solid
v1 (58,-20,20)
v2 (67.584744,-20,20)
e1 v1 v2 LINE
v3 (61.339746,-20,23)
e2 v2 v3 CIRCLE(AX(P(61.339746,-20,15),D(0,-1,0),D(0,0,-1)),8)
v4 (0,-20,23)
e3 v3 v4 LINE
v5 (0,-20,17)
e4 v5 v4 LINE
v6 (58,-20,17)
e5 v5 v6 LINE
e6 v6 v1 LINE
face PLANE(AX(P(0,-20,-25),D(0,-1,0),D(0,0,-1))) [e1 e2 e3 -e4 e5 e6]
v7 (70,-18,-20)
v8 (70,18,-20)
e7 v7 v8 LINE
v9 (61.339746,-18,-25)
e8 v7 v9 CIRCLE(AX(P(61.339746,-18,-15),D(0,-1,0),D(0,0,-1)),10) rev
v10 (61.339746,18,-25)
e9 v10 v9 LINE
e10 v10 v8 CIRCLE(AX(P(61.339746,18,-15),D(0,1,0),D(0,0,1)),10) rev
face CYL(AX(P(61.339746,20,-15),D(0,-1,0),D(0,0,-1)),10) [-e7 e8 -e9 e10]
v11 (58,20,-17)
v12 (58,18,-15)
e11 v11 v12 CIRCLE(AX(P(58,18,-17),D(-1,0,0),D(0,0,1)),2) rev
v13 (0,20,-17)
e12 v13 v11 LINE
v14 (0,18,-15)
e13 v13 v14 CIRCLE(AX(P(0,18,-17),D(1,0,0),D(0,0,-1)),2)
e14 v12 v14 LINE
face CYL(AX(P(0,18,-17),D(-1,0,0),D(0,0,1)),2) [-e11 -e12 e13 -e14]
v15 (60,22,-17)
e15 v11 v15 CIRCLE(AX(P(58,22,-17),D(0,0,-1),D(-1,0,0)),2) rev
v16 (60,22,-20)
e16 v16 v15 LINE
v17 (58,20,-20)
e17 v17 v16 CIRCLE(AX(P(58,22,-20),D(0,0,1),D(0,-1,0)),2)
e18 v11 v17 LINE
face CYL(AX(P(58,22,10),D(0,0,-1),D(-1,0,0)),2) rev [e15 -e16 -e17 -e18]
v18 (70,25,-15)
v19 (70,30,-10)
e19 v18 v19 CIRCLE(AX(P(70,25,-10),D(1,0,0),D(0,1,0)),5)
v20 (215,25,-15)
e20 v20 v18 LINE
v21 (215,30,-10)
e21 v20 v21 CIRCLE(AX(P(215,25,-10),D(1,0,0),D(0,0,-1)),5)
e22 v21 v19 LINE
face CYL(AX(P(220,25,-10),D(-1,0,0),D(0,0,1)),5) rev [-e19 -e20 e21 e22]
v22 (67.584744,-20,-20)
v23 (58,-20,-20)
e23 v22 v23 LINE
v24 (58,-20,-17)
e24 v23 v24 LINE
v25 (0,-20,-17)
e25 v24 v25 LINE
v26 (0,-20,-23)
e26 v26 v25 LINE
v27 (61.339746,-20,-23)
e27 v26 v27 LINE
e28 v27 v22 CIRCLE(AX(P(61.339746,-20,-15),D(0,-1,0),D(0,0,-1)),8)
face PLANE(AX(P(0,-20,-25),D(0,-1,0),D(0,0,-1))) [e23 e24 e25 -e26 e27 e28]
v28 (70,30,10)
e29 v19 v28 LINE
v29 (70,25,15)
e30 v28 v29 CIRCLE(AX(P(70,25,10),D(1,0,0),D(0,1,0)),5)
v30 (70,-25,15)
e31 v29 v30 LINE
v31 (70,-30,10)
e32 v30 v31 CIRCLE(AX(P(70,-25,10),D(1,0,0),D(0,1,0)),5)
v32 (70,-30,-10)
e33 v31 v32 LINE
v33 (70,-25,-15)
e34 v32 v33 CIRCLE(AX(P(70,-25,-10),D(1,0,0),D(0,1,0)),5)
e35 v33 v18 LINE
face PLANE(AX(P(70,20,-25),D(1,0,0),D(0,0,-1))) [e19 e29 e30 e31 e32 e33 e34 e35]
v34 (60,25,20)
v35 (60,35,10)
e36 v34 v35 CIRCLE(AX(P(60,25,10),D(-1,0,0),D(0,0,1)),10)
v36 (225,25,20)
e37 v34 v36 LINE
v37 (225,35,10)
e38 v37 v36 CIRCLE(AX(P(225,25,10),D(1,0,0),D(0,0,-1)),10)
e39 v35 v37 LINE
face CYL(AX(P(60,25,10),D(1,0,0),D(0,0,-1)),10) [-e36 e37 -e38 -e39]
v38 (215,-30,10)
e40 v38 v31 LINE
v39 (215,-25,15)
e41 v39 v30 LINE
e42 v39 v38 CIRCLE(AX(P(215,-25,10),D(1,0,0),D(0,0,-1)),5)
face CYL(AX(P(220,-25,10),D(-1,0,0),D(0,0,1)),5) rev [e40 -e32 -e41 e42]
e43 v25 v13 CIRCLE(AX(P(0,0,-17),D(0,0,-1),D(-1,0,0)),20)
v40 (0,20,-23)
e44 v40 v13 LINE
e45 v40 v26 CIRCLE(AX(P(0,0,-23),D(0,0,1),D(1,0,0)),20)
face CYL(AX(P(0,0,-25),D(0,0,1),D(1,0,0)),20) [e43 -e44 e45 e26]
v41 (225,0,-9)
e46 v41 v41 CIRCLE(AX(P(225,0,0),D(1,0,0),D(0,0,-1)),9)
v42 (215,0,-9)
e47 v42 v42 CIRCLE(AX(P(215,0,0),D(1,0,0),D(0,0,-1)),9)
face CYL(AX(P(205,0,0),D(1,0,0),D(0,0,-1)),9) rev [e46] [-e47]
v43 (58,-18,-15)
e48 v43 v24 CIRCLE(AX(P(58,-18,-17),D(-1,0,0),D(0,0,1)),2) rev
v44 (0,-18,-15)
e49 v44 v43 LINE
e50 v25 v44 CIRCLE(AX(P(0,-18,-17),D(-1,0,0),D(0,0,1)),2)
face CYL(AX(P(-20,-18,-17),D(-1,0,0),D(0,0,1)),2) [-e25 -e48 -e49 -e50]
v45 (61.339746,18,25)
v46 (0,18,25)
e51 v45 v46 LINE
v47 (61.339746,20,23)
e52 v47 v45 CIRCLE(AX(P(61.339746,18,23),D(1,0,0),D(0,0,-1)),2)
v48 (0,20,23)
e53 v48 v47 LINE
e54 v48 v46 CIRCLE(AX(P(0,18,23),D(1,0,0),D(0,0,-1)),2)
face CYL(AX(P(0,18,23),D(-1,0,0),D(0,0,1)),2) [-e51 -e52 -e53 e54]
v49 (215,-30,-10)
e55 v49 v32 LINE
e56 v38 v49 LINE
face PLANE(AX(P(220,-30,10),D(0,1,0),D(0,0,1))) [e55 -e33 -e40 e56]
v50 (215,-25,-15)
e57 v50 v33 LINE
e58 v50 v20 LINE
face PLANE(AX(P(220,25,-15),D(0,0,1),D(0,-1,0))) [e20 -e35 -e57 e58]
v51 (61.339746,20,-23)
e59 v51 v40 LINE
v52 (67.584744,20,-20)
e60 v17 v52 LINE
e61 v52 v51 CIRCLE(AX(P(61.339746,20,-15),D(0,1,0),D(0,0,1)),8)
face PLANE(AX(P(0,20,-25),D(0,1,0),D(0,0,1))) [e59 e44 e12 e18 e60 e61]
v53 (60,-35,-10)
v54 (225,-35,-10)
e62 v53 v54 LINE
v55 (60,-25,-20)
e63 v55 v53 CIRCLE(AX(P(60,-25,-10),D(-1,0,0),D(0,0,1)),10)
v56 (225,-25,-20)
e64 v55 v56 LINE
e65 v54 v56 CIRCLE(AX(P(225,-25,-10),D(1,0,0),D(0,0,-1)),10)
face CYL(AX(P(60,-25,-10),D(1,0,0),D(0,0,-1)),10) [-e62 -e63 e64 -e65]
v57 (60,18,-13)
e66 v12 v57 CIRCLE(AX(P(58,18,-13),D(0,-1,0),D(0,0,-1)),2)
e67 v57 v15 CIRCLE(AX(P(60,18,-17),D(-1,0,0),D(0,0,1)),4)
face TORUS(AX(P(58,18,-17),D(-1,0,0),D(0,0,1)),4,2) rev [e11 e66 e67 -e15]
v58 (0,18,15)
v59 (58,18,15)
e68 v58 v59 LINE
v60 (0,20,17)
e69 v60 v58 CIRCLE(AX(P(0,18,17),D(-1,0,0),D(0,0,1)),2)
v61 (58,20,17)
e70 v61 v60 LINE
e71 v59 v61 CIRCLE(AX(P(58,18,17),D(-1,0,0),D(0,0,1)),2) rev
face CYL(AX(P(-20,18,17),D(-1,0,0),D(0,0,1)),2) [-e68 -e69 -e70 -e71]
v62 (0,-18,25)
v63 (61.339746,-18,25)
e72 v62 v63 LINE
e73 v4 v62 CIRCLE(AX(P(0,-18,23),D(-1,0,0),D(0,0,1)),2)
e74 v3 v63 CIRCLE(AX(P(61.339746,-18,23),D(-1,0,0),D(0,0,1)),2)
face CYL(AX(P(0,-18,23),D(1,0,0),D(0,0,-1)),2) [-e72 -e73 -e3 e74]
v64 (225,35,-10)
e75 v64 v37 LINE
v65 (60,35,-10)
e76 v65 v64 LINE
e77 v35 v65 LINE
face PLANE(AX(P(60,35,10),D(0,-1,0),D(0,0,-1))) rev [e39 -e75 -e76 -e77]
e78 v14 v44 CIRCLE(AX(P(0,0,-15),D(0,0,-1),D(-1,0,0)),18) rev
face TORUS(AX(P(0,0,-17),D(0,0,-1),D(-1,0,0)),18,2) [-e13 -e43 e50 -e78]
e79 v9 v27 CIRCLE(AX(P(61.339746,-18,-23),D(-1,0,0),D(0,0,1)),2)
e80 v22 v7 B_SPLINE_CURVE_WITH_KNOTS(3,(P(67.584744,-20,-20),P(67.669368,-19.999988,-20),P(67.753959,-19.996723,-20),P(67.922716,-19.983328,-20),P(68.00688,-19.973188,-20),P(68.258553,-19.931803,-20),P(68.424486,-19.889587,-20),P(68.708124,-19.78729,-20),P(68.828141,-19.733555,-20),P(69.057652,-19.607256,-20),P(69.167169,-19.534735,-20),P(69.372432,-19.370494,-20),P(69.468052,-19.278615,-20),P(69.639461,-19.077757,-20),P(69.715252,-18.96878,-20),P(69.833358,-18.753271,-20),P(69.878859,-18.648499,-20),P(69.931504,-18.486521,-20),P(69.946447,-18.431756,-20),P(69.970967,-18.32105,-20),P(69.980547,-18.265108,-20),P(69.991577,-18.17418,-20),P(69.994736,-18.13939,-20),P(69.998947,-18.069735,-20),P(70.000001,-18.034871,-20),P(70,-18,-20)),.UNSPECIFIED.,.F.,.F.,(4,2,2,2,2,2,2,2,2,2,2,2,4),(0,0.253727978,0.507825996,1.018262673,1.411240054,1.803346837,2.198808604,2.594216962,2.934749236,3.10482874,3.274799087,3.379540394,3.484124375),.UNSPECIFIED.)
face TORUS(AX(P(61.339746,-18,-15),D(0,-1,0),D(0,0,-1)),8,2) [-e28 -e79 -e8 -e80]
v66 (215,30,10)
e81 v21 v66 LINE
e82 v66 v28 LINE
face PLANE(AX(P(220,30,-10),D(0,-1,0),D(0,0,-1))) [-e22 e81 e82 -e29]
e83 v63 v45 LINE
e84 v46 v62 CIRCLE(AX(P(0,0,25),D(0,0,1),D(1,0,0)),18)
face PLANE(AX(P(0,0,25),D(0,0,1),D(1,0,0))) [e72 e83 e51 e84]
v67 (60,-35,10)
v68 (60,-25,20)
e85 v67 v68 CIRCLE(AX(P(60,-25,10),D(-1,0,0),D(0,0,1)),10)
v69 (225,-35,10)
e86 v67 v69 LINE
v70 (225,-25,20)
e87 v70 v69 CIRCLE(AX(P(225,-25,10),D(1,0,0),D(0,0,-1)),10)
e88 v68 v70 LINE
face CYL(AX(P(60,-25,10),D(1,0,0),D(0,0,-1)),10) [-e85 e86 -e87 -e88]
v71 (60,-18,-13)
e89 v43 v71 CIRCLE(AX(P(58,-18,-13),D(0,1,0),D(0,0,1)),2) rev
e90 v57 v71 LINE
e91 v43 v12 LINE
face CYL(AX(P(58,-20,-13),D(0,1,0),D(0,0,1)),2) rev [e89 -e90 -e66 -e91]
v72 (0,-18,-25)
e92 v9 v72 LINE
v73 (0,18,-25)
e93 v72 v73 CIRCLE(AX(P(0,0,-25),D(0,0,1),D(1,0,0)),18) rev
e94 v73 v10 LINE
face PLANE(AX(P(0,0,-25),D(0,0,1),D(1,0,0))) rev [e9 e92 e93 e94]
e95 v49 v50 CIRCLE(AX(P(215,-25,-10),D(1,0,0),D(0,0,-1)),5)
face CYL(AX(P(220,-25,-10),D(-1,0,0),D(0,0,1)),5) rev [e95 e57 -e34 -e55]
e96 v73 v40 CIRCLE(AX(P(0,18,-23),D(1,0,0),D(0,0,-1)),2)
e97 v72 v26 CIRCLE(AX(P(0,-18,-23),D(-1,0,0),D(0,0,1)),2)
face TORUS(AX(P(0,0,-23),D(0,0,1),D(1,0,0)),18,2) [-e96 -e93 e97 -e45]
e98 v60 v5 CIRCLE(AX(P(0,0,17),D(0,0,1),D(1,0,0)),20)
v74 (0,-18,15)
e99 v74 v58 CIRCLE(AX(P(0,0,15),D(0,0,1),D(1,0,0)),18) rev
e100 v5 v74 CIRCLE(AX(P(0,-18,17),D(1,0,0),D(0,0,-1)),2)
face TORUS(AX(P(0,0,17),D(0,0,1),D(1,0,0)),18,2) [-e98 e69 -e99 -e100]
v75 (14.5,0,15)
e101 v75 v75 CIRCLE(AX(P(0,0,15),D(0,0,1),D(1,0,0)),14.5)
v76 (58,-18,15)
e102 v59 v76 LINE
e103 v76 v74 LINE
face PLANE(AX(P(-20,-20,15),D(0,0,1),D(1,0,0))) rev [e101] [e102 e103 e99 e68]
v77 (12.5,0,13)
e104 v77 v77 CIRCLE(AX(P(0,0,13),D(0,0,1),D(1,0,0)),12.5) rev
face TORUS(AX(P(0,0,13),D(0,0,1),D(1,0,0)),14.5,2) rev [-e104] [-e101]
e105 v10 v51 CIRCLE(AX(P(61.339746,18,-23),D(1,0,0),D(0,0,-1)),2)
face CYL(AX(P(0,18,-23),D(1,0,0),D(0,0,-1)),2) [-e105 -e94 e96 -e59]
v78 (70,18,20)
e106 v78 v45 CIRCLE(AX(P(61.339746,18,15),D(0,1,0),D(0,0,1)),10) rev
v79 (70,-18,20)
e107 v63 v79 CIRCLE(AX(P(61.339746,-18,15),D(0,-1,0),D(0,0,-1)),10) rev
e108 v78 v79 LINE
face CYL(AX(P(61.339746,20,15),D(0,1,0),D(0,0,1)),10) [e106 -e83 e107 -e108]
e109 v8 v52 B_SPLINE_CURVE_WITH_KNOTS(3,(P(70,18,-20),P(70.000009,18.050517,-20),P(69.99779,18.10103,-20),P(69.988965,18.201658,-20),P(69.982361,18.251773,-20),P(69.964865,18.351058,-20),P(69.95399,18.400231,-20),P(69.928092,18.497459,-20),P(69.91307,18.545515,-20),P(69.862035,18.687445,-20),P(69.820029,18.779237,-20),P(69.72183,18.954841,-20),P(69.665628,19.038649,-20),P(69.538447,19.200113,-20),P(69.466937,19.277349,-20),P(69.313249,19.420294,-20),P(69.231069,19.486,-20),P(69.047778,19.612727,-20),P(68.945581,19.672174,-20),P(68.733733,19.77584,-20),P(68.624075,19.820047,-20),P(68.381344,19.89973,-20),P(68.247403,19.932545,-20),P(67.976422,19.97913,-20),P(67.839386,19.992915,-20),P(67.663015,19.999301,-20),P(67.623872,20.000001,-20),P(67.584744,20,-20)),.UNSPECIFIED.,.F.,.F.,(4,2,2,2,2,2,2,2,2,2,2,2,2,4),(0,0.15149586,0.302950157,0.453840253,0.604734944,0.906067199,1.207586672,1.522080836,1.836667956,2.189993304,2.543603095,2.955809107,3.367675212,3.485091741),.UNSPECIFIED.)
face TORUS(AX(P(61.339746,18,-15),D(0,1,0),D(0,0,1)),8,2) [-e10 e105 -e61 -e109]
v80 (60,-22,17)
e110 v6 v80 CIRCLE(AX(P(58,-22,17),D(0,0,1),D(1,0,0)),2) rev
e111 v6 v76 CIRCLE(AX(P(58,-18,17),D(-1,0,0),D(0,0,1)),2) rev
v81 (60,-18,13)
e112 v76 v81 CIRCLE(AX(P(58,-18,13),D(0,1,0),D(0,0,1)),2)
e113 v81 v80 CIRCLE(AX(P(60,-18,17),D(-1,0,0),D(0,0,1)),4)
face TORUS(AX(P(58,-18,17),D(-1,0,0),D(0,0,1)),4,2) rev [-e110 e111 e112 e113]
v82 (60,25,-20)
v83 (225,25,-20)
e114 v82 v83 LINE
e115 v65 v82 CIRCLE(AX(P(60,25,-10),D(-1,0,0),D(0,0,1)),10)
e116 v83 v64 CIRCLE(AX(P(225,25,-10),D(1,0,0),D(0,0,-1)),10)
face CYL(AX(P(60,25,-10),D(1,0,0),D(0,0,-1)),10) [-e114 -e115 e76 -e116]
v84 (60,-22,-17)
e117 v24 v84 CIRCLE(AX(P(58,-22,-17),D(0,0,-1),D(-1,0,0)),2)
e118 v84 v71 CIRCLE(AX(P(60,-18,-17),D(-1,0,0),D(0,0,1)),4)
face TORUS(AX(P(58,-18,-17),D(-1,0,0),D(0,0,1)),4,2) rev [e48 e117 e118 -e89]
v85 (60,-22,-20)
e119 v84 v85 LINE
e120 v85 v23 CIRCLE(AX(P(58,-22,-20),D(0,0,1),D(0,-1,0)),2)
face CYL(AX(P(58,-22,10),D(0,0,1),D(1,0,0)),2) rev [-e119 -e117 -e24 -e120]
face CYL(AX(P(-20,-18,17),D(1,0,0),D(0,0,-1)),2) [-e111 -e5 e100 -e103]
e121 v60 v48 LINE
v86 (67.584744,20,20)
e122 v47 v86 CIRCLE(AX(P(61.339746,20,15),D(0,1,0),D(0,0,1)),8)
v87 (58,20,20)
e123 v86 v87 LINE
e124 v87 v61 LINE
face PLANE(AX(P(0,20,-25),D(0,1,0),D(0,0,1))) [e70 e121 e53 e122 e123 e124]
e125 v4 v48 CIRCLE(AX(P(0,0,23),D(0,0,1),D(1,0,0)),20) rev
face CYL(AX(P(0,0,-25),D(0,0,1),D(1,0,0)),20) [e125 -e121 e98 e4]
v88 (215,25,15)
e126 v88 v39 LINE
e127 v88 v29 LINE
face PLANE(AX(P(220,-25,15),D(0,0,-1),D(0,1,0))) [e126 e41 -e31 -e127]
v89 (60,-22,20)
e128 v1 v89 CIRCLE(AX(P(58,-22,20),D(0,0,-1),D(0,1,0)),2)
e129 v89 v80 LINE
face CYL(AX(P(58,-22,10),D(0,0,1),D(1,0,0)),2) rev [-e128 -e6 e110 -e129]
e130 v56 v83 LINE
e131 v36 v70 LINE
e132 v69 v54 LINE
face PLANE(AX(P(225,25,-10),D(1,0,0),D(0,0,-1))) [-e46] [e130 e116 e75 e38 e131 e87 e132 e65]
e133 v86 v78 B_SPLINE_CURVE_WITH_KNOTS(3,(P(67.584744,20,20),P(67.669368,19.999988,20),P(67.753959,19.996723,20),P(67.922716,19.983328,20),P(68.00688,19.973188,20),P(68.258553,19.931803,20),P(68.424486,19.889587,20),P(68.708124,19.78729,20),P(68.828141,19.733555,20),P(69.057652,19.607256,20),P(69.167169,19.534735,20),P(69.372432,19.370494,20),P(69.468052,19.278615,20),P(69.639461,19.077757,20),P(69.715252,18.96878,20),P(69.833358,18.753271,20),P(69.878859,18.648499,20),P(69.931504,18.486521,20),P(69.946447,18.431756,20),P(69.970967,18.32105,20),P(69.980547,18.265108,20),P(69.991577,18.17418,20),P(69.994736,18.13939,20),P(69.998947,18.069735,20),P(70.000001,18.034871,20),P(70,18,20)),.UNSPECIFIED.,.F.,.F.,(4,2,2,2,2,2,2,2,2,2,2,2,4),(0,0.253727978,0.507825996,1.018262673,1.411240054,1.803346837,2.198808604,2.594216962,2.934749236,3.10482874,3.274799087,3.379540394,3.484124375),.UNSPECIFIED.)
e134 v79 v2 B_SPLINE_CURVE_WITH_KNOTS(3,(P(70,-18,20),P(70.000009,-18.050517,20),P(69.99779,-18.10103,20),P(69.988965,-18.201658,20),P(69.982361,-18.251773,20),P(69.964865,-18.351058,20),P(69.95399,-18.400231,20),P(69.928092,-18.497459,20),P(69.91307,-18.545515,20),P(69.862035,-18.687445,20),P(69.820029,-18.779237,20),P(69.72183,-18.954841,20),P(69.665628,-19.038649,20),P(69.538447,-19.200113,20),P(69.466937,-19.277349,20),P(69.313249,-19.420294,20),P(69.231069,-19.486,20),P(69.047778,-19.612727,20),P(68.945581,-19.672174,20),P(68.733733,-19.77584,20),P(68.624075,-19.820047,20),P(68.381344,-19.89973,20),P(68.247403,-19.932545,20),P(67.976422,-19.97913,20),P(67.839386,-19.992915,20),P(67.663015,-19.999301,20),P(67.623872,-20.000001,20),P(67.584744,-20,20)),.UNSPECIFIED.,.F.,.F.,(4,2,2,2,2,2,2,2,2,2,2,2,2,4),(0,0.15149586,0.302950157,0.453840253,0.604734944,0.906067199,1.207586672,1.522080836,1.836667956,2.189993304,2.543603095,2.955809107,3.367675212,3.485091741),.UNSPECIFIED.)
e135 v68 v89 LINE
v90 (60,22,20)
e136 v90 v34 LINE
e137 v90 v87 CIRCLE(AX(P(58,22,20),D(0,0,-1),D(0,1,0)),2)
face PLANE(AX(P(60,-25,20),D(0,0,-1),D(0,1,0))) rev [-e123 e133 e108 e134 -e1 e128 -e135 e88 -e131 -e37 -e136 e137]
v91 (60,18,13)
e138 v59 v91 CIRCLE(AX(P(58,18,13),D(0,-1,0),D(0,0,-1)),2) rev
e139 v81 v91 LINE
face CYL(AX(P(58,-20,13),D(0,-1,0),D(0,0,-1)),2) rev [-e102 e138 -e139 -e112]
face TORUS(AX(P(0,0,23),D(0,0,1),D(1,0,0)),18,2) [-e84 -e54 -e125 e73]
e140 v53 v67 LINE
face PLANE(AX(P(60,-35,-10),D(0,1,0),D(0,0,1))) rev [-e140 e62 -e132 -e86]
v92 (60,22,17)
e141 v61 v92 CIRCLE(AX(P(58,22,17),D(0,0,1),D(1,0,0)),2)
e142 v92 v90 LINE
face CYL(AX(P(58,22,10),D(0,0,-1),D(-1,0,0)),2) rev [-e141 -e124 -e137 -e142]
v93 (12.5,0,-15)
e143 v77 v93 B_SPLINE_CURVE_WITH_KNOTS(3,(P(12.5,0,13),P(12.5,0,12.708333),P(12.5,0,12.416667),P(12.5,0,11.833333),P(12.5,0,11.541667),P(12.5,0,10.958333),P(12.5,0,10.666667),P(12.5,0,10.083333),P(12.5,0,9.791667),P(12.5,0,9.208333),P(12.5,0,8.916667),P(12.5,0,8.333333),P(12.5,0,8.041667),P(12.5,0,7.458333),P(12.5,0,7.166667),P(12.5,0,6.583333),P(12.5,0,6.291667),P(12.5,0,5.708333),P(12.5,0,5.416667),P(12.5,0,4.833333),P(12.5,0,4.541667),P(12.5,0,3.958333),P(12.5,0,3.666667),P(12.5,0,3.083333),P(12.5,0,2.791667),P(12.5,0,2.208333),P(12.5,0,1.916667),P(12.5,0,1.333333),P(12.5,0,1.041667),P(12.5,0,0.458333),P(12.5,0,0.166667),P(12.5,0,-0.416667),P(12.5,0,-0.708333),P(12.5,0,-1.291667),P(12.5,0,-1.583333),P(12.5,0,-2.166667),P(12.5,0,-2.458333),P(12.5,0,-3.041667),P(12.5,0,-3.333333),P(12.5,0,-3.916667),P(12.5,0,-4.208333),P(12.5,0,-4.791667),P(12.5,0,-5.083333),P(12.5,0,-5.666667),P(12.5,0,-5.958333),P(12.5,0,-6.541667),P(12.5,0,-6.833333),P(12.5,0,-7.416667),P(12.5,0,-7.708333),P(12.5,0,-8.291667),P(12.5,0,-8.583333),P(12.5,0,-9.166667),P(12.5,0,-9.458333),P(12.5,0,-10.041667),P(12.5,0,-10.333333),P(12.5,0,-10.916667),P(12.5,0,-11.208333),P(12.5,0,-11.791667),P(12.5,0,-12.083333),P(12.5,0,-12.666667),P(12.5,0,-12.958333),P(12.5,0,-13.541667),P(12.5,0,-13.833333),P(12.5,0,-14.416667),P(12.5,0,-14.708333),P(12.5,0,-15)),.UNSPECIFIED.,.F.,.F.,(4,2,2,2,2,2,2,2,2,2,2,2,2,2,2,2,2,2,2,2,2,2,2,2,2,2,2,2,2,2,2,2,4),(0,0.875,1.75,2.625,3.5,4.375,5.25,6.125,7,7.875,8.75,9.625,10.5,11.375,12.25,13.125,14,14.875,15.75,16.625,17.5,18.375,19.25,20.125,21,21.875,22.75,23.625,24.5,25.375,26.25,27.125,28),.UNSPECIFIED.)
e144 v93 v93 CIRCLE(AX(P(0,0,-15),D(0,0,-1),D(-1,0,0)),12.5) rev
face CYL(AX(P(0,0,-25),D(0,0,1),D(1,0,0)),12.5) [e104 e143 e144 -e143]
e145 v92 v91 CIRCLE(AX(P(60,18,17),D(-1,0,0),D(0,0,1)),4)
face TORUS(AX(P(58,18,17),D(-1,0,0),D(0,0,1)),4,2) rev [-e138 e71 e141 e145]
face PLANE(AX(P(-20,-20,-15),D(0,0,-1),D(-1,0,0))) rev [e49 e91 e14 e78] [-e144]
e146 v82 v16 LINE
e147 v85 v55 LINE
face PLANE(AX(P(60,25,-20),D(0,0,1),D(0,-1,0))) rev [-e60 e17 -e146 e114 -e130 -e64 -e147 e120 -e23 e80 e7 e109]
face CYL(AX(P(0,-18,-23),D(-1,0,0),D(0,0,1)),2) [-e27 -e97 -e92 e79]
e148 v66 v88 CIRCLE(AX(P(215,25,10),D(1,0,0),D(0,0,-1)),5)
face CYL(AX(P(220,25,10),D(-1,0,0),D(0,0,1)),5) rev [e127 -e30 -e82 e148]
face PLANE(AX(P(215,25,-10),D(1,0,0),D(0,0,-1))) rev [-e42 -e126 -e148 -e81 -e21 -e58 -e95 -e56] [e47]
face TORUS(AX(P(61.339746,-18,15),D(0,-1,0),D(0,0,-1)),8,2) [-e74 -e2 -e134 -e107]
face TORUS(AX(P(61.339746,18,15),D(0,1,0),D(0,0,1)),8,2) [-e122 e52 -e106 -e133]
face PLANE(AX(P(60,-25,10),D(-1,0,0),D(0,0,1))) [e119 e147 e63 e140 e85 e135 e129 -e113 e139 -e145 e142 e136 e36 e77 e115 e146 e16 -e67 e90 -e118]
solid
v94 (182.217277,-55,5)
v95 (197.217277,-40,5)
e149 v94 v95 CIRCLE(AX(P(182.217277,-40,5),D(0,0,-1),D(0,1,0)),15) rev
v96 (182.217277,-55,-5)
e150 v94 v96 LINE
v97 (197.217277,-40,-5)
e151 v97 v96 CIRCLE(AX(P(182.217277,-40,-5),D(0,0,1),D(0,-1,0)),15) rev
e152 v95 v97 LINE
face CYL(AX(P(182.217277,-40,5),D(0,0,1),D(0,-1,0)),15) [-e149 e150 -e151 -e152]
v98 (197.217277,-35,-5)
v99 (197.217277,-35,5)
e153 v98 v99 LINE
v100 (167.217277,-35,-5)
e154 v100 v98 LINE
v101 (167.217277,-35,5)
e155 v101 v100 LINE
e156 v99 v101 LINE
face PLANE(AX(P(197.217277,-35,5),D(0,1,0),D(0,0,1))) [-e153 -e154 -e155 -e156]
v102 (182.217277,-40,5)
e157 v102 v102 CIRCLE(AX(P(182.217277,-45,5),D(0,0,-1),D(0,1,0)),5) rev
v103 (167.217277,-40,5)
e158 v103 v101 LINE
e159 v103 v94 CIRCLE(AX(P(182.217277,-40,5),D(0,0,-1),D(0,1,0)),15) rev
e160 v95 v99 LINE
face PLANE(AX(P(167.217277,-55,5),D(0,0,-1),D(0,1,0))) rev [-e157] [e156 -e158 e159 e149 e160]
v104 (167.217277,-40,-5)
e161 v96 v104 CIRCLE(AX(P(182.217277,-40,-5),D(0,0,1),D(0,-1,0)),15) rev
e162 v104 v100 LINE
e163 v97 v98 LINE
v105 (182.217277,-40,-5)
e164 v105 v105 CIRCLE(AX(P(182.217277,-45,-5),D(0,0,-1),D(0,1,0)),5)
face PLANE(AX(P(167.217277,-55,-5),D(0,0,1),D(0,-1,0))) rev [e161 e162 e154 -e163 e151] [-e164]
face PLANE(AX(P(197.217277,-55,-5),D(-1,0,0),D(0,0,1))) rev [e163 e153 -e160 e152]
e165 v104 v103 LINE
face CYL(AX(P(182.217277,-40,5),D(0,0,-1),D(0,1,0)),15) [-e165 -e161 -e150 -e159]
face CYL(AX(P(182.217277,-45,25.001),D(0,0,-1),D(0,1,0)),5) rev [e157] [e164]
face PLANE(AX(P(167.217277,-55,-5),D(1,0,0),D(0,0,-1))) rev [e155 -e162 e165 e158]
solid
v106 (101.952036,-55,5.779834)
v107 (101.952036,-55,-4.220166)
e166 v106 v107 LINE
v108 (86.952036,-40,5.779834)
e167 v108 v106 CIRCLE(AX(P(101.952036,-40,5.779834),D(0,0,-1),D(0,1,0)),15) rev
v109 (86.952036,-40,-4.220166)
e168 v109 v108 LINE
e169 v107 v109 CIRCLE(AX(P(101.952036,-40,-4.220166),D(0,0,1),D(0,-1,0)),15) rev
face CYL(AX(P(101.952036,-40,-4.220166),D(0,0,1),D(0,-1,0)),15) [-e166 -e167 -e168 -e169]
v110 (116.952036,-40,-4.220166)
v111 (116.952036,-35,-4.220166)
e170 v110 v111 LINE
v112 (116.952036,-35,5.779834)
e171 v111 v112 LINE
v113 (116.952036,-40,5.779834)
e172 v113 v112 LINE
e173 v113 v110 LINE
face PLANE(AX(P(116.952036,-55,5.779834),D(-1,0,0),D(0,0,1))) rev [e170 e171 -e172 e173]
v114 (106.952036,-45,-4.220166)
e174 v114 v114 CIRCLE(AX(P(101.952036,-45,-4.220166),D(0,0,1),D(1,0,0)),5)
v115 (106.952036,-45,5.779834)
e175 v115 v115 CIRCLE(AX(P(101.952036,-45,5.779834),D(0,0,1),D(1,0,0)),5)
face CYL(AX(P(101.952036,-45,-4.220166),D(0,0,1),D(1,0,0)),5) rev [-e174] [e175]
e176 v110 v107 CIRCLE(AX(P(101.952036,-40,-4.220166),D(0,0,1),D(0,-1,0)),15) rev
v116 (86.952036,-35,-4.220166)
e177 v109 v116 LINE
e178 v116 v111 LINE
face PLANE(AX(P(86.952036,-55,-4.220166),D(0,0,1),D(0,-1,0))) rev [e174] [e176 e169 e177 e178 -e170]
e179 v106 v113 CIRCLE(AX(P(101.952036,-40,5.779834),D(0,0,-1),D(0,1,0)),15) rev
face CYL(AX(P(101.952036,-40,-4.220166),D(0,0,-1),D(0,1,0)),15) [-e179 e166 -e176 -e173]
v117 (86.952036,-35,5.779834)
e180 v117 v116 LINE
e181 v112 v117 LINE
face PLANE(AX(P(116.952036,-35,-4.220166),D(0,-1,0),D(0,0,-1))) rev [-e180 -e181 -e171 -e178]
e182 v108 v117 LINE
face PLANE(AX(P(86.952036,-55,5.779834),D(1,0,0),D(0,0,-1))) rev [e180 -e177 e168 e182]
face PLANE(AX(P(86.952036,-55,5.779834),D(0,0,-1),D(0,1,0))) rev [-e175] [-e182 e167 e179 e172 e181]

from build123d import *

# Parameters (mm, degrees)
BOSS_EXTRUDE1_DEPTH      = 25
BOSS_EXTRUDE1_DEPTH_BACK = 25
SKETCH2_W                = 30
SKETCH2_H                = 40
CUT_EXTRUDE1_DEPTH       = 96.524865873
BOSS_EXTRUDE2_REACH      = 90.318
SKETCH3_R                = 12.5
STRUCTURAL_MEMBER1_DEPTH = 150
BOSS_EXTRUDE3_DEPTH      = 10
BOSS_EXTRUDE4_DEPTH      = 5
BOSS_EXTRUDE4_DEPTH_BACK = 5
FILLET1_R                = 10
FILLET2_R                = 2
FILLET3_R                = 2
SKETCH17_W               = 30
SKETCH17_H               = 10
BOSS_EXTRUDE5_DEPTH      = 20
BOSS_EXTRUDE5_2_DEPTH    = 20
FILLET4_R                = 15
SKETCH18_R               = 5
CUT_EXTRUDE2_DEPTH       = 10
FILLET5_R                = 15
SKETCH19_R               = 5
CUT_EXTRUDE3_DEPTH       = 10
SKETCH20_R               = 9
CUT_EXTRUDE4_DEPTH       = 20


# Some blends are built 0.0001 mm under size
with BuildPart() as part:
    # Sketch1 → Boss-Extrude1 (new, two sides: drawn at the far end of the back side and taken through both)
    with BuildSketch(Plane.XY.offset(-BOSS_EXTRUDE1_DEPTH_BACK)):
        with BuildLine():
            Line((0, 20), (70, 20))
            Line((70, 20), (70, -20))
            Line((70, -20), (0, -20))
            ThreePointArc((0, -20), (-20, 0), (0, 20))
        make_face()
    extrude(amount=BOSS_EXTRUDE1_DEPTH + BOSS_EXTRUDE1_DEPTH_BACK)

    # Sketch2 → Cut-Extrude1 (cut, through all)
    with BuildSketch(Plane(origin=(70, 0, 0), x_dir=(0, 0, -1), z_dir=(1, 0, 0))):
        Rectangle(SKETCH2_W, SKETCH2_H)
    extrude(amount=-CUT_EXTRUDE1_DEPTH, mode=Mode.SUBTRACT)


with BuildPart() as cut_extrude1_piece_1:
    # of the separate pieces the step leaves, piece 1, a body of its own (cut_extrude1_pieces)
    add(part.part.solids().sort_by_distance((0, 20, -25))[0])

    # Sketch3 → Boss-Extrude2 (add, up to next)
    with BuildSketch(Plane.XY.offset(25), mode=Mode.PRIVATE) as boss_extrude2_sk1:
        Circle(SKETCH3_R)
    boss_extrude2_tool1 = extrude(boss_extrude2_sk1.sketch, amount=-BOSS_EXTRUDE2_REACH, mode=Mode.PRIVATE) - cut_extrude1_piece_1.part


with BuildPart() as cut_extrude1_piece_2:
    # of the separate pieces the step leaves, piece 2, a body of its own (cut_extrude1_pieces)
    add(part.part.solids().sort_by_distance((0, 20, 15))[0])


with BuildPart() as cut_extrude1_piece_1_1:
    add(cut_extrude1_piece_1.part)

    add(cut_extrude1_piece_2.part)  # Boss-Extrude2 merges Cut-Extrude1 piece 2
    add(boss_extrude2_tool1.solids().sort_by_distance((0, 0, 25))[0])



with BuildPart() as body_2:
    # Sketch11 → Structural Member1 (new body)
    with BuildSketch(Plane(origin=(70, 0, 0), x_dir=(0, 0, 1), z_dir=(1, 0, 0))):
        with BuildLine():
            Line((-10, -35), (10, -35))
            ThreePointArc((10, -35), (17.071067812, -32.071067812), (20, -25))
            Line((20, -25), (20, 25))
            ThreePointArc((20, 25), (17.071067812, 32.071067812), (10, 35))
            Line((10, 35), (-10, 35))
            ThreePointArc((-10, 35), (-17.071067812, 32.071067812), (-20, 25))
            Line((-20, 25), (-20, -25))
            ThreePointArc((-20, -25), (-17.071067812, -32.071067812), (-10, -35))
        make_face()
        with BuildLine():
            Line((-10, -30), (10, -30))
            ThreePointArc((10, -30), (13.535533906, -28.535533906), (15, -25))
            Line((15, -25), (15, 25))
            ThreePointArc((15, 25), (13.535533906, 28.535533906), (10, 30))
            Line((10, 30), (-10, 30))
            ThreePointArc((-10, 30), (-13.535533906, 28.535533906), (-15, 25))
            Line((-15, 25), (-15, -25))
            ThreePointArc((-15, -25), (-13.535533906, -28.535533906), (-10, -30))
        make_face(mode=Mode.SUBTRACT)
    extrude(amount=STRUCTURAL_MEMBER1_DEPTH)


with BuildPart() as cut_extrude1_piece_1_2:
    add(cut_extrude1_piece_1_1.part)

    add(body_2.part)  # Boss-Extrude3 merges body 2
    # Sketch12 → Boss-Extrude3 (add)
    with BuildSketch(Plane.ZY.offset(-70)):
        with BuildLine():
            Line((20, -25), (20, 25))
            ThreePointArc((20, 25), (17.071067812, 32.071067812), (10, 35))
            Line((10, 35), (-10, 35))
            ThreePointArc((-10, 35), (-17.071067812, 32.071067812), (-20, 25))
            Line((-20, 25), (-20, -25))
            ThreePointArc((-20, -25), (-17.071067812, -32.071067812), (-10, -35))
            Line((-10, -35), (10, -35))
            ThreePointArc((10, -35), (17.071067812, -32.071067812), (20, -25))
        make_face()
    extrude(amount=BOSS_EXTRUDE3_DEPTH)

    # Sketch14 → Boss-Extrude4 (add, two sides: drawn at the far end of the back side and taken through both)
    with BuildSketch(Plane(origin=(220, 0, 0), x_dir=(0, 0, -1), z_dir=(1, 0, 0)).offset(-BOSS_EXTRUDE4_DEPTH_BACK)):
        with BuildLine():
            Line((10, 35), (-10, 35))
            ThreePointArc((-10, 35), (-17.071067812, 32.071067812), (-20, 25))
            Line((-20, 25), (-20, -25))
            ThreePointArc((-20, -25), (-17.071067812, -32.071067812), (-10, -35))
            Line((-10, -35), (10, -35))
            ThreePointArc((10, -35), (17.071067812, -32.071067812), (20, -25))
            Line((20, -25), (20, 25))
            ThreePointArc((20, 25), (17.071067812, 32.071067812), (10, 35))
        make_face()
    extrude(amount=BOSS_EXTRUDE4_DEPTH + BOSS_EXTRUDE4_DEPTH_BACK)

    # Fillet1
    # the kernel refuses this fillet: 10 mm, written as the material it takes off along each edge
    with BuildSketch(Plane(origin=(70, 41.650635095, -25), x_dir=(-1, 0, 0), z_dir=(0, -1, 0))) as fillet1_piece_1:
        with BuildLine():
            CenterArc((8.660254038, -10), FILLET1_R, 90, 60)
            Line((0, -5), (-0.173205081, -4.9))
            ThreePointArc((-0.173205081, -4.9), (-0.2, -2.5), (-0.2, 0))
            Line((-0.2, 0), (0, 0.2))
            Line((0, 0.2), (8.660254038, 0.2))
            Line((8.660254038, 0.2), (8.660254038, 0))
        make_face()
    extrude(amount=83.301270189, mode=Mode.SUBTRACT)
    with BuildSketch(Plane(origin=(70, 41.650635095, 25), x_dir=(-1, 0, 0), z_dir=(0, -1, 0))) as fillet1_piece_2:
        with BuildLine():
            CenterArc((8.660254038, 10), FILLET1_R, 210, 60)
            Line((0, 5), (-0.173205081, 4.9))
            ThreePointArc((-0.173205081, 4.9), (-0.2, 2.5), (-0.2, 0))
            Line((-0.2, 0), (0, -0.2))
            Line((0, -0.2), (8.660254038, -0.2))
            Line((8.660254038, -0.2), (8.660254038, 0))
        make_face()
    extrude(amount=83.301270189, mode=Mode.SUBTRACT)

    # Fillet2
    fillet2_edges = [cut_extrude1_piece_1_2.edges().sort_by_distance(p)[0] for p in [
        (-12.5, 0, 15),
        (30, 20, -15),
        (-20, 0, -15),
        (30, -20, -15),
        (-20, 0, 15),
        (30, 20, 15),
        (60, 0, -15),
        (30, -20, 15),
        (60, 0, 15),
        (60, 20, 17.5),
        (60, 20, -17.5),
        (60, -20, -17.5),
        (60, -20, 17.5),
    ]]
    fillet(fillet2_edges, radius=FILLET2_R)

    # Fillet3
    fillet3_edges = [cut_extrude1_piece_1_2.edges().sort_by_distance(p)[0] for p in [
        (66.339745962, 20, 23.660254038),
        (30.669872981, 20, 25),
        (-20, 0, 25),
        (66.339745962, -20, 23.660254038),
        (66.339745962, 20, -23.660254038),
        (30.669872981, 20, -25),
        (-20, 0, -25),
        (66.339745962, -20, -23.660254038),
        (30.669872981, -20, 25),
        (30.669872981, -20, -25),
    ]]
    fillet(fillet3_edges, radius=FILLET3_R)

    # Sketch20 → Cut-Extrude4 (cut)
    with BuildSketch(Plane(origin=(225, 0, 0), x_dir=(0, 0, -1), z_dir=(1, 0, 0))):
        Circle(SKETCH20_R)
    extrude(amount=-CUT_EXTRUDE4_DEPTH, mode=Mode.SUBTRACT)


with BuildPart() as body_2_2:
    # Sketch17 → Boss-Extrude5 (new body)
    with BuildSketch(Plane.XZ.offset(35)):
        with Locations((101.952035875, 0.779833619)):
            Rectangle(SKETCH17_W, SKETCH17_H)
    extrude(amount=BOSS_EXTRUDE5_DEPTH)

    # Fillet4
    fillet4_edges = [body_2_2.edges().sort_by_distance(p)[0] for p in [
        (116.952035875, -55, 0.779833619),
        (86.952035875, -55, 0.779833619),
    ]]
    fillet(fillet4_edges, radius=FILLET4_R - 0.0001)  # a hair under: the kernel refuses the full size

    # Sketch19 → Cut-Extrude3 (cut)
    with BuildSketch(Plane.XY.offset(5.779833619)):
        with Locations((101.952035875, -45)):
            Circle(SKETCH19_R)
    extrude(amount=-CUT_EXTRUDE3_DEPTH, mode=Mode.SUBTRACT)


with BuildPart() as body_3:
    # Sketch17 → Boss-Extrude5 2 (new body)
    with BuildSketch(Plane.XZ.offset(35)):
        with Locations((182.217277183, 0)):
            Rectangle(SKETCH17_W, SKETCH17_H)
    extrude(amount=BOSS_EXTRUDE5_2_DEPTH)

    # Sketch18 → Cut-Extrude2 (cut)
    with BuildSketch(Plane(origin=(0, 0, -5), x_dir=(-1, 0, 0), z_dir=(0, 0, -1))):
        with Locations(Location((-182.217277183, -45, 0), (0, 0, 90))):
            Circle(SKETCH18_R)
    extrude(amount=-CUT_EXTRUDE2_DEPTH, mode=Mode.SUBTRACT)

    # Fillet5
    fillet5_edges = [body_3.edges().sort_by_distance(p)[0] for p in [
        (197.217277183, -55, 0),
        (167.217277183, -55, 0),
    ]]
    fillet(fillet5_edges, radius=FILLET5_R - 0.0001)  # a hair under: the kernel refuses the full size


solid = Compound([cut_extrude1_piece_1_2.part, body_2_2.part, body_3.part])
